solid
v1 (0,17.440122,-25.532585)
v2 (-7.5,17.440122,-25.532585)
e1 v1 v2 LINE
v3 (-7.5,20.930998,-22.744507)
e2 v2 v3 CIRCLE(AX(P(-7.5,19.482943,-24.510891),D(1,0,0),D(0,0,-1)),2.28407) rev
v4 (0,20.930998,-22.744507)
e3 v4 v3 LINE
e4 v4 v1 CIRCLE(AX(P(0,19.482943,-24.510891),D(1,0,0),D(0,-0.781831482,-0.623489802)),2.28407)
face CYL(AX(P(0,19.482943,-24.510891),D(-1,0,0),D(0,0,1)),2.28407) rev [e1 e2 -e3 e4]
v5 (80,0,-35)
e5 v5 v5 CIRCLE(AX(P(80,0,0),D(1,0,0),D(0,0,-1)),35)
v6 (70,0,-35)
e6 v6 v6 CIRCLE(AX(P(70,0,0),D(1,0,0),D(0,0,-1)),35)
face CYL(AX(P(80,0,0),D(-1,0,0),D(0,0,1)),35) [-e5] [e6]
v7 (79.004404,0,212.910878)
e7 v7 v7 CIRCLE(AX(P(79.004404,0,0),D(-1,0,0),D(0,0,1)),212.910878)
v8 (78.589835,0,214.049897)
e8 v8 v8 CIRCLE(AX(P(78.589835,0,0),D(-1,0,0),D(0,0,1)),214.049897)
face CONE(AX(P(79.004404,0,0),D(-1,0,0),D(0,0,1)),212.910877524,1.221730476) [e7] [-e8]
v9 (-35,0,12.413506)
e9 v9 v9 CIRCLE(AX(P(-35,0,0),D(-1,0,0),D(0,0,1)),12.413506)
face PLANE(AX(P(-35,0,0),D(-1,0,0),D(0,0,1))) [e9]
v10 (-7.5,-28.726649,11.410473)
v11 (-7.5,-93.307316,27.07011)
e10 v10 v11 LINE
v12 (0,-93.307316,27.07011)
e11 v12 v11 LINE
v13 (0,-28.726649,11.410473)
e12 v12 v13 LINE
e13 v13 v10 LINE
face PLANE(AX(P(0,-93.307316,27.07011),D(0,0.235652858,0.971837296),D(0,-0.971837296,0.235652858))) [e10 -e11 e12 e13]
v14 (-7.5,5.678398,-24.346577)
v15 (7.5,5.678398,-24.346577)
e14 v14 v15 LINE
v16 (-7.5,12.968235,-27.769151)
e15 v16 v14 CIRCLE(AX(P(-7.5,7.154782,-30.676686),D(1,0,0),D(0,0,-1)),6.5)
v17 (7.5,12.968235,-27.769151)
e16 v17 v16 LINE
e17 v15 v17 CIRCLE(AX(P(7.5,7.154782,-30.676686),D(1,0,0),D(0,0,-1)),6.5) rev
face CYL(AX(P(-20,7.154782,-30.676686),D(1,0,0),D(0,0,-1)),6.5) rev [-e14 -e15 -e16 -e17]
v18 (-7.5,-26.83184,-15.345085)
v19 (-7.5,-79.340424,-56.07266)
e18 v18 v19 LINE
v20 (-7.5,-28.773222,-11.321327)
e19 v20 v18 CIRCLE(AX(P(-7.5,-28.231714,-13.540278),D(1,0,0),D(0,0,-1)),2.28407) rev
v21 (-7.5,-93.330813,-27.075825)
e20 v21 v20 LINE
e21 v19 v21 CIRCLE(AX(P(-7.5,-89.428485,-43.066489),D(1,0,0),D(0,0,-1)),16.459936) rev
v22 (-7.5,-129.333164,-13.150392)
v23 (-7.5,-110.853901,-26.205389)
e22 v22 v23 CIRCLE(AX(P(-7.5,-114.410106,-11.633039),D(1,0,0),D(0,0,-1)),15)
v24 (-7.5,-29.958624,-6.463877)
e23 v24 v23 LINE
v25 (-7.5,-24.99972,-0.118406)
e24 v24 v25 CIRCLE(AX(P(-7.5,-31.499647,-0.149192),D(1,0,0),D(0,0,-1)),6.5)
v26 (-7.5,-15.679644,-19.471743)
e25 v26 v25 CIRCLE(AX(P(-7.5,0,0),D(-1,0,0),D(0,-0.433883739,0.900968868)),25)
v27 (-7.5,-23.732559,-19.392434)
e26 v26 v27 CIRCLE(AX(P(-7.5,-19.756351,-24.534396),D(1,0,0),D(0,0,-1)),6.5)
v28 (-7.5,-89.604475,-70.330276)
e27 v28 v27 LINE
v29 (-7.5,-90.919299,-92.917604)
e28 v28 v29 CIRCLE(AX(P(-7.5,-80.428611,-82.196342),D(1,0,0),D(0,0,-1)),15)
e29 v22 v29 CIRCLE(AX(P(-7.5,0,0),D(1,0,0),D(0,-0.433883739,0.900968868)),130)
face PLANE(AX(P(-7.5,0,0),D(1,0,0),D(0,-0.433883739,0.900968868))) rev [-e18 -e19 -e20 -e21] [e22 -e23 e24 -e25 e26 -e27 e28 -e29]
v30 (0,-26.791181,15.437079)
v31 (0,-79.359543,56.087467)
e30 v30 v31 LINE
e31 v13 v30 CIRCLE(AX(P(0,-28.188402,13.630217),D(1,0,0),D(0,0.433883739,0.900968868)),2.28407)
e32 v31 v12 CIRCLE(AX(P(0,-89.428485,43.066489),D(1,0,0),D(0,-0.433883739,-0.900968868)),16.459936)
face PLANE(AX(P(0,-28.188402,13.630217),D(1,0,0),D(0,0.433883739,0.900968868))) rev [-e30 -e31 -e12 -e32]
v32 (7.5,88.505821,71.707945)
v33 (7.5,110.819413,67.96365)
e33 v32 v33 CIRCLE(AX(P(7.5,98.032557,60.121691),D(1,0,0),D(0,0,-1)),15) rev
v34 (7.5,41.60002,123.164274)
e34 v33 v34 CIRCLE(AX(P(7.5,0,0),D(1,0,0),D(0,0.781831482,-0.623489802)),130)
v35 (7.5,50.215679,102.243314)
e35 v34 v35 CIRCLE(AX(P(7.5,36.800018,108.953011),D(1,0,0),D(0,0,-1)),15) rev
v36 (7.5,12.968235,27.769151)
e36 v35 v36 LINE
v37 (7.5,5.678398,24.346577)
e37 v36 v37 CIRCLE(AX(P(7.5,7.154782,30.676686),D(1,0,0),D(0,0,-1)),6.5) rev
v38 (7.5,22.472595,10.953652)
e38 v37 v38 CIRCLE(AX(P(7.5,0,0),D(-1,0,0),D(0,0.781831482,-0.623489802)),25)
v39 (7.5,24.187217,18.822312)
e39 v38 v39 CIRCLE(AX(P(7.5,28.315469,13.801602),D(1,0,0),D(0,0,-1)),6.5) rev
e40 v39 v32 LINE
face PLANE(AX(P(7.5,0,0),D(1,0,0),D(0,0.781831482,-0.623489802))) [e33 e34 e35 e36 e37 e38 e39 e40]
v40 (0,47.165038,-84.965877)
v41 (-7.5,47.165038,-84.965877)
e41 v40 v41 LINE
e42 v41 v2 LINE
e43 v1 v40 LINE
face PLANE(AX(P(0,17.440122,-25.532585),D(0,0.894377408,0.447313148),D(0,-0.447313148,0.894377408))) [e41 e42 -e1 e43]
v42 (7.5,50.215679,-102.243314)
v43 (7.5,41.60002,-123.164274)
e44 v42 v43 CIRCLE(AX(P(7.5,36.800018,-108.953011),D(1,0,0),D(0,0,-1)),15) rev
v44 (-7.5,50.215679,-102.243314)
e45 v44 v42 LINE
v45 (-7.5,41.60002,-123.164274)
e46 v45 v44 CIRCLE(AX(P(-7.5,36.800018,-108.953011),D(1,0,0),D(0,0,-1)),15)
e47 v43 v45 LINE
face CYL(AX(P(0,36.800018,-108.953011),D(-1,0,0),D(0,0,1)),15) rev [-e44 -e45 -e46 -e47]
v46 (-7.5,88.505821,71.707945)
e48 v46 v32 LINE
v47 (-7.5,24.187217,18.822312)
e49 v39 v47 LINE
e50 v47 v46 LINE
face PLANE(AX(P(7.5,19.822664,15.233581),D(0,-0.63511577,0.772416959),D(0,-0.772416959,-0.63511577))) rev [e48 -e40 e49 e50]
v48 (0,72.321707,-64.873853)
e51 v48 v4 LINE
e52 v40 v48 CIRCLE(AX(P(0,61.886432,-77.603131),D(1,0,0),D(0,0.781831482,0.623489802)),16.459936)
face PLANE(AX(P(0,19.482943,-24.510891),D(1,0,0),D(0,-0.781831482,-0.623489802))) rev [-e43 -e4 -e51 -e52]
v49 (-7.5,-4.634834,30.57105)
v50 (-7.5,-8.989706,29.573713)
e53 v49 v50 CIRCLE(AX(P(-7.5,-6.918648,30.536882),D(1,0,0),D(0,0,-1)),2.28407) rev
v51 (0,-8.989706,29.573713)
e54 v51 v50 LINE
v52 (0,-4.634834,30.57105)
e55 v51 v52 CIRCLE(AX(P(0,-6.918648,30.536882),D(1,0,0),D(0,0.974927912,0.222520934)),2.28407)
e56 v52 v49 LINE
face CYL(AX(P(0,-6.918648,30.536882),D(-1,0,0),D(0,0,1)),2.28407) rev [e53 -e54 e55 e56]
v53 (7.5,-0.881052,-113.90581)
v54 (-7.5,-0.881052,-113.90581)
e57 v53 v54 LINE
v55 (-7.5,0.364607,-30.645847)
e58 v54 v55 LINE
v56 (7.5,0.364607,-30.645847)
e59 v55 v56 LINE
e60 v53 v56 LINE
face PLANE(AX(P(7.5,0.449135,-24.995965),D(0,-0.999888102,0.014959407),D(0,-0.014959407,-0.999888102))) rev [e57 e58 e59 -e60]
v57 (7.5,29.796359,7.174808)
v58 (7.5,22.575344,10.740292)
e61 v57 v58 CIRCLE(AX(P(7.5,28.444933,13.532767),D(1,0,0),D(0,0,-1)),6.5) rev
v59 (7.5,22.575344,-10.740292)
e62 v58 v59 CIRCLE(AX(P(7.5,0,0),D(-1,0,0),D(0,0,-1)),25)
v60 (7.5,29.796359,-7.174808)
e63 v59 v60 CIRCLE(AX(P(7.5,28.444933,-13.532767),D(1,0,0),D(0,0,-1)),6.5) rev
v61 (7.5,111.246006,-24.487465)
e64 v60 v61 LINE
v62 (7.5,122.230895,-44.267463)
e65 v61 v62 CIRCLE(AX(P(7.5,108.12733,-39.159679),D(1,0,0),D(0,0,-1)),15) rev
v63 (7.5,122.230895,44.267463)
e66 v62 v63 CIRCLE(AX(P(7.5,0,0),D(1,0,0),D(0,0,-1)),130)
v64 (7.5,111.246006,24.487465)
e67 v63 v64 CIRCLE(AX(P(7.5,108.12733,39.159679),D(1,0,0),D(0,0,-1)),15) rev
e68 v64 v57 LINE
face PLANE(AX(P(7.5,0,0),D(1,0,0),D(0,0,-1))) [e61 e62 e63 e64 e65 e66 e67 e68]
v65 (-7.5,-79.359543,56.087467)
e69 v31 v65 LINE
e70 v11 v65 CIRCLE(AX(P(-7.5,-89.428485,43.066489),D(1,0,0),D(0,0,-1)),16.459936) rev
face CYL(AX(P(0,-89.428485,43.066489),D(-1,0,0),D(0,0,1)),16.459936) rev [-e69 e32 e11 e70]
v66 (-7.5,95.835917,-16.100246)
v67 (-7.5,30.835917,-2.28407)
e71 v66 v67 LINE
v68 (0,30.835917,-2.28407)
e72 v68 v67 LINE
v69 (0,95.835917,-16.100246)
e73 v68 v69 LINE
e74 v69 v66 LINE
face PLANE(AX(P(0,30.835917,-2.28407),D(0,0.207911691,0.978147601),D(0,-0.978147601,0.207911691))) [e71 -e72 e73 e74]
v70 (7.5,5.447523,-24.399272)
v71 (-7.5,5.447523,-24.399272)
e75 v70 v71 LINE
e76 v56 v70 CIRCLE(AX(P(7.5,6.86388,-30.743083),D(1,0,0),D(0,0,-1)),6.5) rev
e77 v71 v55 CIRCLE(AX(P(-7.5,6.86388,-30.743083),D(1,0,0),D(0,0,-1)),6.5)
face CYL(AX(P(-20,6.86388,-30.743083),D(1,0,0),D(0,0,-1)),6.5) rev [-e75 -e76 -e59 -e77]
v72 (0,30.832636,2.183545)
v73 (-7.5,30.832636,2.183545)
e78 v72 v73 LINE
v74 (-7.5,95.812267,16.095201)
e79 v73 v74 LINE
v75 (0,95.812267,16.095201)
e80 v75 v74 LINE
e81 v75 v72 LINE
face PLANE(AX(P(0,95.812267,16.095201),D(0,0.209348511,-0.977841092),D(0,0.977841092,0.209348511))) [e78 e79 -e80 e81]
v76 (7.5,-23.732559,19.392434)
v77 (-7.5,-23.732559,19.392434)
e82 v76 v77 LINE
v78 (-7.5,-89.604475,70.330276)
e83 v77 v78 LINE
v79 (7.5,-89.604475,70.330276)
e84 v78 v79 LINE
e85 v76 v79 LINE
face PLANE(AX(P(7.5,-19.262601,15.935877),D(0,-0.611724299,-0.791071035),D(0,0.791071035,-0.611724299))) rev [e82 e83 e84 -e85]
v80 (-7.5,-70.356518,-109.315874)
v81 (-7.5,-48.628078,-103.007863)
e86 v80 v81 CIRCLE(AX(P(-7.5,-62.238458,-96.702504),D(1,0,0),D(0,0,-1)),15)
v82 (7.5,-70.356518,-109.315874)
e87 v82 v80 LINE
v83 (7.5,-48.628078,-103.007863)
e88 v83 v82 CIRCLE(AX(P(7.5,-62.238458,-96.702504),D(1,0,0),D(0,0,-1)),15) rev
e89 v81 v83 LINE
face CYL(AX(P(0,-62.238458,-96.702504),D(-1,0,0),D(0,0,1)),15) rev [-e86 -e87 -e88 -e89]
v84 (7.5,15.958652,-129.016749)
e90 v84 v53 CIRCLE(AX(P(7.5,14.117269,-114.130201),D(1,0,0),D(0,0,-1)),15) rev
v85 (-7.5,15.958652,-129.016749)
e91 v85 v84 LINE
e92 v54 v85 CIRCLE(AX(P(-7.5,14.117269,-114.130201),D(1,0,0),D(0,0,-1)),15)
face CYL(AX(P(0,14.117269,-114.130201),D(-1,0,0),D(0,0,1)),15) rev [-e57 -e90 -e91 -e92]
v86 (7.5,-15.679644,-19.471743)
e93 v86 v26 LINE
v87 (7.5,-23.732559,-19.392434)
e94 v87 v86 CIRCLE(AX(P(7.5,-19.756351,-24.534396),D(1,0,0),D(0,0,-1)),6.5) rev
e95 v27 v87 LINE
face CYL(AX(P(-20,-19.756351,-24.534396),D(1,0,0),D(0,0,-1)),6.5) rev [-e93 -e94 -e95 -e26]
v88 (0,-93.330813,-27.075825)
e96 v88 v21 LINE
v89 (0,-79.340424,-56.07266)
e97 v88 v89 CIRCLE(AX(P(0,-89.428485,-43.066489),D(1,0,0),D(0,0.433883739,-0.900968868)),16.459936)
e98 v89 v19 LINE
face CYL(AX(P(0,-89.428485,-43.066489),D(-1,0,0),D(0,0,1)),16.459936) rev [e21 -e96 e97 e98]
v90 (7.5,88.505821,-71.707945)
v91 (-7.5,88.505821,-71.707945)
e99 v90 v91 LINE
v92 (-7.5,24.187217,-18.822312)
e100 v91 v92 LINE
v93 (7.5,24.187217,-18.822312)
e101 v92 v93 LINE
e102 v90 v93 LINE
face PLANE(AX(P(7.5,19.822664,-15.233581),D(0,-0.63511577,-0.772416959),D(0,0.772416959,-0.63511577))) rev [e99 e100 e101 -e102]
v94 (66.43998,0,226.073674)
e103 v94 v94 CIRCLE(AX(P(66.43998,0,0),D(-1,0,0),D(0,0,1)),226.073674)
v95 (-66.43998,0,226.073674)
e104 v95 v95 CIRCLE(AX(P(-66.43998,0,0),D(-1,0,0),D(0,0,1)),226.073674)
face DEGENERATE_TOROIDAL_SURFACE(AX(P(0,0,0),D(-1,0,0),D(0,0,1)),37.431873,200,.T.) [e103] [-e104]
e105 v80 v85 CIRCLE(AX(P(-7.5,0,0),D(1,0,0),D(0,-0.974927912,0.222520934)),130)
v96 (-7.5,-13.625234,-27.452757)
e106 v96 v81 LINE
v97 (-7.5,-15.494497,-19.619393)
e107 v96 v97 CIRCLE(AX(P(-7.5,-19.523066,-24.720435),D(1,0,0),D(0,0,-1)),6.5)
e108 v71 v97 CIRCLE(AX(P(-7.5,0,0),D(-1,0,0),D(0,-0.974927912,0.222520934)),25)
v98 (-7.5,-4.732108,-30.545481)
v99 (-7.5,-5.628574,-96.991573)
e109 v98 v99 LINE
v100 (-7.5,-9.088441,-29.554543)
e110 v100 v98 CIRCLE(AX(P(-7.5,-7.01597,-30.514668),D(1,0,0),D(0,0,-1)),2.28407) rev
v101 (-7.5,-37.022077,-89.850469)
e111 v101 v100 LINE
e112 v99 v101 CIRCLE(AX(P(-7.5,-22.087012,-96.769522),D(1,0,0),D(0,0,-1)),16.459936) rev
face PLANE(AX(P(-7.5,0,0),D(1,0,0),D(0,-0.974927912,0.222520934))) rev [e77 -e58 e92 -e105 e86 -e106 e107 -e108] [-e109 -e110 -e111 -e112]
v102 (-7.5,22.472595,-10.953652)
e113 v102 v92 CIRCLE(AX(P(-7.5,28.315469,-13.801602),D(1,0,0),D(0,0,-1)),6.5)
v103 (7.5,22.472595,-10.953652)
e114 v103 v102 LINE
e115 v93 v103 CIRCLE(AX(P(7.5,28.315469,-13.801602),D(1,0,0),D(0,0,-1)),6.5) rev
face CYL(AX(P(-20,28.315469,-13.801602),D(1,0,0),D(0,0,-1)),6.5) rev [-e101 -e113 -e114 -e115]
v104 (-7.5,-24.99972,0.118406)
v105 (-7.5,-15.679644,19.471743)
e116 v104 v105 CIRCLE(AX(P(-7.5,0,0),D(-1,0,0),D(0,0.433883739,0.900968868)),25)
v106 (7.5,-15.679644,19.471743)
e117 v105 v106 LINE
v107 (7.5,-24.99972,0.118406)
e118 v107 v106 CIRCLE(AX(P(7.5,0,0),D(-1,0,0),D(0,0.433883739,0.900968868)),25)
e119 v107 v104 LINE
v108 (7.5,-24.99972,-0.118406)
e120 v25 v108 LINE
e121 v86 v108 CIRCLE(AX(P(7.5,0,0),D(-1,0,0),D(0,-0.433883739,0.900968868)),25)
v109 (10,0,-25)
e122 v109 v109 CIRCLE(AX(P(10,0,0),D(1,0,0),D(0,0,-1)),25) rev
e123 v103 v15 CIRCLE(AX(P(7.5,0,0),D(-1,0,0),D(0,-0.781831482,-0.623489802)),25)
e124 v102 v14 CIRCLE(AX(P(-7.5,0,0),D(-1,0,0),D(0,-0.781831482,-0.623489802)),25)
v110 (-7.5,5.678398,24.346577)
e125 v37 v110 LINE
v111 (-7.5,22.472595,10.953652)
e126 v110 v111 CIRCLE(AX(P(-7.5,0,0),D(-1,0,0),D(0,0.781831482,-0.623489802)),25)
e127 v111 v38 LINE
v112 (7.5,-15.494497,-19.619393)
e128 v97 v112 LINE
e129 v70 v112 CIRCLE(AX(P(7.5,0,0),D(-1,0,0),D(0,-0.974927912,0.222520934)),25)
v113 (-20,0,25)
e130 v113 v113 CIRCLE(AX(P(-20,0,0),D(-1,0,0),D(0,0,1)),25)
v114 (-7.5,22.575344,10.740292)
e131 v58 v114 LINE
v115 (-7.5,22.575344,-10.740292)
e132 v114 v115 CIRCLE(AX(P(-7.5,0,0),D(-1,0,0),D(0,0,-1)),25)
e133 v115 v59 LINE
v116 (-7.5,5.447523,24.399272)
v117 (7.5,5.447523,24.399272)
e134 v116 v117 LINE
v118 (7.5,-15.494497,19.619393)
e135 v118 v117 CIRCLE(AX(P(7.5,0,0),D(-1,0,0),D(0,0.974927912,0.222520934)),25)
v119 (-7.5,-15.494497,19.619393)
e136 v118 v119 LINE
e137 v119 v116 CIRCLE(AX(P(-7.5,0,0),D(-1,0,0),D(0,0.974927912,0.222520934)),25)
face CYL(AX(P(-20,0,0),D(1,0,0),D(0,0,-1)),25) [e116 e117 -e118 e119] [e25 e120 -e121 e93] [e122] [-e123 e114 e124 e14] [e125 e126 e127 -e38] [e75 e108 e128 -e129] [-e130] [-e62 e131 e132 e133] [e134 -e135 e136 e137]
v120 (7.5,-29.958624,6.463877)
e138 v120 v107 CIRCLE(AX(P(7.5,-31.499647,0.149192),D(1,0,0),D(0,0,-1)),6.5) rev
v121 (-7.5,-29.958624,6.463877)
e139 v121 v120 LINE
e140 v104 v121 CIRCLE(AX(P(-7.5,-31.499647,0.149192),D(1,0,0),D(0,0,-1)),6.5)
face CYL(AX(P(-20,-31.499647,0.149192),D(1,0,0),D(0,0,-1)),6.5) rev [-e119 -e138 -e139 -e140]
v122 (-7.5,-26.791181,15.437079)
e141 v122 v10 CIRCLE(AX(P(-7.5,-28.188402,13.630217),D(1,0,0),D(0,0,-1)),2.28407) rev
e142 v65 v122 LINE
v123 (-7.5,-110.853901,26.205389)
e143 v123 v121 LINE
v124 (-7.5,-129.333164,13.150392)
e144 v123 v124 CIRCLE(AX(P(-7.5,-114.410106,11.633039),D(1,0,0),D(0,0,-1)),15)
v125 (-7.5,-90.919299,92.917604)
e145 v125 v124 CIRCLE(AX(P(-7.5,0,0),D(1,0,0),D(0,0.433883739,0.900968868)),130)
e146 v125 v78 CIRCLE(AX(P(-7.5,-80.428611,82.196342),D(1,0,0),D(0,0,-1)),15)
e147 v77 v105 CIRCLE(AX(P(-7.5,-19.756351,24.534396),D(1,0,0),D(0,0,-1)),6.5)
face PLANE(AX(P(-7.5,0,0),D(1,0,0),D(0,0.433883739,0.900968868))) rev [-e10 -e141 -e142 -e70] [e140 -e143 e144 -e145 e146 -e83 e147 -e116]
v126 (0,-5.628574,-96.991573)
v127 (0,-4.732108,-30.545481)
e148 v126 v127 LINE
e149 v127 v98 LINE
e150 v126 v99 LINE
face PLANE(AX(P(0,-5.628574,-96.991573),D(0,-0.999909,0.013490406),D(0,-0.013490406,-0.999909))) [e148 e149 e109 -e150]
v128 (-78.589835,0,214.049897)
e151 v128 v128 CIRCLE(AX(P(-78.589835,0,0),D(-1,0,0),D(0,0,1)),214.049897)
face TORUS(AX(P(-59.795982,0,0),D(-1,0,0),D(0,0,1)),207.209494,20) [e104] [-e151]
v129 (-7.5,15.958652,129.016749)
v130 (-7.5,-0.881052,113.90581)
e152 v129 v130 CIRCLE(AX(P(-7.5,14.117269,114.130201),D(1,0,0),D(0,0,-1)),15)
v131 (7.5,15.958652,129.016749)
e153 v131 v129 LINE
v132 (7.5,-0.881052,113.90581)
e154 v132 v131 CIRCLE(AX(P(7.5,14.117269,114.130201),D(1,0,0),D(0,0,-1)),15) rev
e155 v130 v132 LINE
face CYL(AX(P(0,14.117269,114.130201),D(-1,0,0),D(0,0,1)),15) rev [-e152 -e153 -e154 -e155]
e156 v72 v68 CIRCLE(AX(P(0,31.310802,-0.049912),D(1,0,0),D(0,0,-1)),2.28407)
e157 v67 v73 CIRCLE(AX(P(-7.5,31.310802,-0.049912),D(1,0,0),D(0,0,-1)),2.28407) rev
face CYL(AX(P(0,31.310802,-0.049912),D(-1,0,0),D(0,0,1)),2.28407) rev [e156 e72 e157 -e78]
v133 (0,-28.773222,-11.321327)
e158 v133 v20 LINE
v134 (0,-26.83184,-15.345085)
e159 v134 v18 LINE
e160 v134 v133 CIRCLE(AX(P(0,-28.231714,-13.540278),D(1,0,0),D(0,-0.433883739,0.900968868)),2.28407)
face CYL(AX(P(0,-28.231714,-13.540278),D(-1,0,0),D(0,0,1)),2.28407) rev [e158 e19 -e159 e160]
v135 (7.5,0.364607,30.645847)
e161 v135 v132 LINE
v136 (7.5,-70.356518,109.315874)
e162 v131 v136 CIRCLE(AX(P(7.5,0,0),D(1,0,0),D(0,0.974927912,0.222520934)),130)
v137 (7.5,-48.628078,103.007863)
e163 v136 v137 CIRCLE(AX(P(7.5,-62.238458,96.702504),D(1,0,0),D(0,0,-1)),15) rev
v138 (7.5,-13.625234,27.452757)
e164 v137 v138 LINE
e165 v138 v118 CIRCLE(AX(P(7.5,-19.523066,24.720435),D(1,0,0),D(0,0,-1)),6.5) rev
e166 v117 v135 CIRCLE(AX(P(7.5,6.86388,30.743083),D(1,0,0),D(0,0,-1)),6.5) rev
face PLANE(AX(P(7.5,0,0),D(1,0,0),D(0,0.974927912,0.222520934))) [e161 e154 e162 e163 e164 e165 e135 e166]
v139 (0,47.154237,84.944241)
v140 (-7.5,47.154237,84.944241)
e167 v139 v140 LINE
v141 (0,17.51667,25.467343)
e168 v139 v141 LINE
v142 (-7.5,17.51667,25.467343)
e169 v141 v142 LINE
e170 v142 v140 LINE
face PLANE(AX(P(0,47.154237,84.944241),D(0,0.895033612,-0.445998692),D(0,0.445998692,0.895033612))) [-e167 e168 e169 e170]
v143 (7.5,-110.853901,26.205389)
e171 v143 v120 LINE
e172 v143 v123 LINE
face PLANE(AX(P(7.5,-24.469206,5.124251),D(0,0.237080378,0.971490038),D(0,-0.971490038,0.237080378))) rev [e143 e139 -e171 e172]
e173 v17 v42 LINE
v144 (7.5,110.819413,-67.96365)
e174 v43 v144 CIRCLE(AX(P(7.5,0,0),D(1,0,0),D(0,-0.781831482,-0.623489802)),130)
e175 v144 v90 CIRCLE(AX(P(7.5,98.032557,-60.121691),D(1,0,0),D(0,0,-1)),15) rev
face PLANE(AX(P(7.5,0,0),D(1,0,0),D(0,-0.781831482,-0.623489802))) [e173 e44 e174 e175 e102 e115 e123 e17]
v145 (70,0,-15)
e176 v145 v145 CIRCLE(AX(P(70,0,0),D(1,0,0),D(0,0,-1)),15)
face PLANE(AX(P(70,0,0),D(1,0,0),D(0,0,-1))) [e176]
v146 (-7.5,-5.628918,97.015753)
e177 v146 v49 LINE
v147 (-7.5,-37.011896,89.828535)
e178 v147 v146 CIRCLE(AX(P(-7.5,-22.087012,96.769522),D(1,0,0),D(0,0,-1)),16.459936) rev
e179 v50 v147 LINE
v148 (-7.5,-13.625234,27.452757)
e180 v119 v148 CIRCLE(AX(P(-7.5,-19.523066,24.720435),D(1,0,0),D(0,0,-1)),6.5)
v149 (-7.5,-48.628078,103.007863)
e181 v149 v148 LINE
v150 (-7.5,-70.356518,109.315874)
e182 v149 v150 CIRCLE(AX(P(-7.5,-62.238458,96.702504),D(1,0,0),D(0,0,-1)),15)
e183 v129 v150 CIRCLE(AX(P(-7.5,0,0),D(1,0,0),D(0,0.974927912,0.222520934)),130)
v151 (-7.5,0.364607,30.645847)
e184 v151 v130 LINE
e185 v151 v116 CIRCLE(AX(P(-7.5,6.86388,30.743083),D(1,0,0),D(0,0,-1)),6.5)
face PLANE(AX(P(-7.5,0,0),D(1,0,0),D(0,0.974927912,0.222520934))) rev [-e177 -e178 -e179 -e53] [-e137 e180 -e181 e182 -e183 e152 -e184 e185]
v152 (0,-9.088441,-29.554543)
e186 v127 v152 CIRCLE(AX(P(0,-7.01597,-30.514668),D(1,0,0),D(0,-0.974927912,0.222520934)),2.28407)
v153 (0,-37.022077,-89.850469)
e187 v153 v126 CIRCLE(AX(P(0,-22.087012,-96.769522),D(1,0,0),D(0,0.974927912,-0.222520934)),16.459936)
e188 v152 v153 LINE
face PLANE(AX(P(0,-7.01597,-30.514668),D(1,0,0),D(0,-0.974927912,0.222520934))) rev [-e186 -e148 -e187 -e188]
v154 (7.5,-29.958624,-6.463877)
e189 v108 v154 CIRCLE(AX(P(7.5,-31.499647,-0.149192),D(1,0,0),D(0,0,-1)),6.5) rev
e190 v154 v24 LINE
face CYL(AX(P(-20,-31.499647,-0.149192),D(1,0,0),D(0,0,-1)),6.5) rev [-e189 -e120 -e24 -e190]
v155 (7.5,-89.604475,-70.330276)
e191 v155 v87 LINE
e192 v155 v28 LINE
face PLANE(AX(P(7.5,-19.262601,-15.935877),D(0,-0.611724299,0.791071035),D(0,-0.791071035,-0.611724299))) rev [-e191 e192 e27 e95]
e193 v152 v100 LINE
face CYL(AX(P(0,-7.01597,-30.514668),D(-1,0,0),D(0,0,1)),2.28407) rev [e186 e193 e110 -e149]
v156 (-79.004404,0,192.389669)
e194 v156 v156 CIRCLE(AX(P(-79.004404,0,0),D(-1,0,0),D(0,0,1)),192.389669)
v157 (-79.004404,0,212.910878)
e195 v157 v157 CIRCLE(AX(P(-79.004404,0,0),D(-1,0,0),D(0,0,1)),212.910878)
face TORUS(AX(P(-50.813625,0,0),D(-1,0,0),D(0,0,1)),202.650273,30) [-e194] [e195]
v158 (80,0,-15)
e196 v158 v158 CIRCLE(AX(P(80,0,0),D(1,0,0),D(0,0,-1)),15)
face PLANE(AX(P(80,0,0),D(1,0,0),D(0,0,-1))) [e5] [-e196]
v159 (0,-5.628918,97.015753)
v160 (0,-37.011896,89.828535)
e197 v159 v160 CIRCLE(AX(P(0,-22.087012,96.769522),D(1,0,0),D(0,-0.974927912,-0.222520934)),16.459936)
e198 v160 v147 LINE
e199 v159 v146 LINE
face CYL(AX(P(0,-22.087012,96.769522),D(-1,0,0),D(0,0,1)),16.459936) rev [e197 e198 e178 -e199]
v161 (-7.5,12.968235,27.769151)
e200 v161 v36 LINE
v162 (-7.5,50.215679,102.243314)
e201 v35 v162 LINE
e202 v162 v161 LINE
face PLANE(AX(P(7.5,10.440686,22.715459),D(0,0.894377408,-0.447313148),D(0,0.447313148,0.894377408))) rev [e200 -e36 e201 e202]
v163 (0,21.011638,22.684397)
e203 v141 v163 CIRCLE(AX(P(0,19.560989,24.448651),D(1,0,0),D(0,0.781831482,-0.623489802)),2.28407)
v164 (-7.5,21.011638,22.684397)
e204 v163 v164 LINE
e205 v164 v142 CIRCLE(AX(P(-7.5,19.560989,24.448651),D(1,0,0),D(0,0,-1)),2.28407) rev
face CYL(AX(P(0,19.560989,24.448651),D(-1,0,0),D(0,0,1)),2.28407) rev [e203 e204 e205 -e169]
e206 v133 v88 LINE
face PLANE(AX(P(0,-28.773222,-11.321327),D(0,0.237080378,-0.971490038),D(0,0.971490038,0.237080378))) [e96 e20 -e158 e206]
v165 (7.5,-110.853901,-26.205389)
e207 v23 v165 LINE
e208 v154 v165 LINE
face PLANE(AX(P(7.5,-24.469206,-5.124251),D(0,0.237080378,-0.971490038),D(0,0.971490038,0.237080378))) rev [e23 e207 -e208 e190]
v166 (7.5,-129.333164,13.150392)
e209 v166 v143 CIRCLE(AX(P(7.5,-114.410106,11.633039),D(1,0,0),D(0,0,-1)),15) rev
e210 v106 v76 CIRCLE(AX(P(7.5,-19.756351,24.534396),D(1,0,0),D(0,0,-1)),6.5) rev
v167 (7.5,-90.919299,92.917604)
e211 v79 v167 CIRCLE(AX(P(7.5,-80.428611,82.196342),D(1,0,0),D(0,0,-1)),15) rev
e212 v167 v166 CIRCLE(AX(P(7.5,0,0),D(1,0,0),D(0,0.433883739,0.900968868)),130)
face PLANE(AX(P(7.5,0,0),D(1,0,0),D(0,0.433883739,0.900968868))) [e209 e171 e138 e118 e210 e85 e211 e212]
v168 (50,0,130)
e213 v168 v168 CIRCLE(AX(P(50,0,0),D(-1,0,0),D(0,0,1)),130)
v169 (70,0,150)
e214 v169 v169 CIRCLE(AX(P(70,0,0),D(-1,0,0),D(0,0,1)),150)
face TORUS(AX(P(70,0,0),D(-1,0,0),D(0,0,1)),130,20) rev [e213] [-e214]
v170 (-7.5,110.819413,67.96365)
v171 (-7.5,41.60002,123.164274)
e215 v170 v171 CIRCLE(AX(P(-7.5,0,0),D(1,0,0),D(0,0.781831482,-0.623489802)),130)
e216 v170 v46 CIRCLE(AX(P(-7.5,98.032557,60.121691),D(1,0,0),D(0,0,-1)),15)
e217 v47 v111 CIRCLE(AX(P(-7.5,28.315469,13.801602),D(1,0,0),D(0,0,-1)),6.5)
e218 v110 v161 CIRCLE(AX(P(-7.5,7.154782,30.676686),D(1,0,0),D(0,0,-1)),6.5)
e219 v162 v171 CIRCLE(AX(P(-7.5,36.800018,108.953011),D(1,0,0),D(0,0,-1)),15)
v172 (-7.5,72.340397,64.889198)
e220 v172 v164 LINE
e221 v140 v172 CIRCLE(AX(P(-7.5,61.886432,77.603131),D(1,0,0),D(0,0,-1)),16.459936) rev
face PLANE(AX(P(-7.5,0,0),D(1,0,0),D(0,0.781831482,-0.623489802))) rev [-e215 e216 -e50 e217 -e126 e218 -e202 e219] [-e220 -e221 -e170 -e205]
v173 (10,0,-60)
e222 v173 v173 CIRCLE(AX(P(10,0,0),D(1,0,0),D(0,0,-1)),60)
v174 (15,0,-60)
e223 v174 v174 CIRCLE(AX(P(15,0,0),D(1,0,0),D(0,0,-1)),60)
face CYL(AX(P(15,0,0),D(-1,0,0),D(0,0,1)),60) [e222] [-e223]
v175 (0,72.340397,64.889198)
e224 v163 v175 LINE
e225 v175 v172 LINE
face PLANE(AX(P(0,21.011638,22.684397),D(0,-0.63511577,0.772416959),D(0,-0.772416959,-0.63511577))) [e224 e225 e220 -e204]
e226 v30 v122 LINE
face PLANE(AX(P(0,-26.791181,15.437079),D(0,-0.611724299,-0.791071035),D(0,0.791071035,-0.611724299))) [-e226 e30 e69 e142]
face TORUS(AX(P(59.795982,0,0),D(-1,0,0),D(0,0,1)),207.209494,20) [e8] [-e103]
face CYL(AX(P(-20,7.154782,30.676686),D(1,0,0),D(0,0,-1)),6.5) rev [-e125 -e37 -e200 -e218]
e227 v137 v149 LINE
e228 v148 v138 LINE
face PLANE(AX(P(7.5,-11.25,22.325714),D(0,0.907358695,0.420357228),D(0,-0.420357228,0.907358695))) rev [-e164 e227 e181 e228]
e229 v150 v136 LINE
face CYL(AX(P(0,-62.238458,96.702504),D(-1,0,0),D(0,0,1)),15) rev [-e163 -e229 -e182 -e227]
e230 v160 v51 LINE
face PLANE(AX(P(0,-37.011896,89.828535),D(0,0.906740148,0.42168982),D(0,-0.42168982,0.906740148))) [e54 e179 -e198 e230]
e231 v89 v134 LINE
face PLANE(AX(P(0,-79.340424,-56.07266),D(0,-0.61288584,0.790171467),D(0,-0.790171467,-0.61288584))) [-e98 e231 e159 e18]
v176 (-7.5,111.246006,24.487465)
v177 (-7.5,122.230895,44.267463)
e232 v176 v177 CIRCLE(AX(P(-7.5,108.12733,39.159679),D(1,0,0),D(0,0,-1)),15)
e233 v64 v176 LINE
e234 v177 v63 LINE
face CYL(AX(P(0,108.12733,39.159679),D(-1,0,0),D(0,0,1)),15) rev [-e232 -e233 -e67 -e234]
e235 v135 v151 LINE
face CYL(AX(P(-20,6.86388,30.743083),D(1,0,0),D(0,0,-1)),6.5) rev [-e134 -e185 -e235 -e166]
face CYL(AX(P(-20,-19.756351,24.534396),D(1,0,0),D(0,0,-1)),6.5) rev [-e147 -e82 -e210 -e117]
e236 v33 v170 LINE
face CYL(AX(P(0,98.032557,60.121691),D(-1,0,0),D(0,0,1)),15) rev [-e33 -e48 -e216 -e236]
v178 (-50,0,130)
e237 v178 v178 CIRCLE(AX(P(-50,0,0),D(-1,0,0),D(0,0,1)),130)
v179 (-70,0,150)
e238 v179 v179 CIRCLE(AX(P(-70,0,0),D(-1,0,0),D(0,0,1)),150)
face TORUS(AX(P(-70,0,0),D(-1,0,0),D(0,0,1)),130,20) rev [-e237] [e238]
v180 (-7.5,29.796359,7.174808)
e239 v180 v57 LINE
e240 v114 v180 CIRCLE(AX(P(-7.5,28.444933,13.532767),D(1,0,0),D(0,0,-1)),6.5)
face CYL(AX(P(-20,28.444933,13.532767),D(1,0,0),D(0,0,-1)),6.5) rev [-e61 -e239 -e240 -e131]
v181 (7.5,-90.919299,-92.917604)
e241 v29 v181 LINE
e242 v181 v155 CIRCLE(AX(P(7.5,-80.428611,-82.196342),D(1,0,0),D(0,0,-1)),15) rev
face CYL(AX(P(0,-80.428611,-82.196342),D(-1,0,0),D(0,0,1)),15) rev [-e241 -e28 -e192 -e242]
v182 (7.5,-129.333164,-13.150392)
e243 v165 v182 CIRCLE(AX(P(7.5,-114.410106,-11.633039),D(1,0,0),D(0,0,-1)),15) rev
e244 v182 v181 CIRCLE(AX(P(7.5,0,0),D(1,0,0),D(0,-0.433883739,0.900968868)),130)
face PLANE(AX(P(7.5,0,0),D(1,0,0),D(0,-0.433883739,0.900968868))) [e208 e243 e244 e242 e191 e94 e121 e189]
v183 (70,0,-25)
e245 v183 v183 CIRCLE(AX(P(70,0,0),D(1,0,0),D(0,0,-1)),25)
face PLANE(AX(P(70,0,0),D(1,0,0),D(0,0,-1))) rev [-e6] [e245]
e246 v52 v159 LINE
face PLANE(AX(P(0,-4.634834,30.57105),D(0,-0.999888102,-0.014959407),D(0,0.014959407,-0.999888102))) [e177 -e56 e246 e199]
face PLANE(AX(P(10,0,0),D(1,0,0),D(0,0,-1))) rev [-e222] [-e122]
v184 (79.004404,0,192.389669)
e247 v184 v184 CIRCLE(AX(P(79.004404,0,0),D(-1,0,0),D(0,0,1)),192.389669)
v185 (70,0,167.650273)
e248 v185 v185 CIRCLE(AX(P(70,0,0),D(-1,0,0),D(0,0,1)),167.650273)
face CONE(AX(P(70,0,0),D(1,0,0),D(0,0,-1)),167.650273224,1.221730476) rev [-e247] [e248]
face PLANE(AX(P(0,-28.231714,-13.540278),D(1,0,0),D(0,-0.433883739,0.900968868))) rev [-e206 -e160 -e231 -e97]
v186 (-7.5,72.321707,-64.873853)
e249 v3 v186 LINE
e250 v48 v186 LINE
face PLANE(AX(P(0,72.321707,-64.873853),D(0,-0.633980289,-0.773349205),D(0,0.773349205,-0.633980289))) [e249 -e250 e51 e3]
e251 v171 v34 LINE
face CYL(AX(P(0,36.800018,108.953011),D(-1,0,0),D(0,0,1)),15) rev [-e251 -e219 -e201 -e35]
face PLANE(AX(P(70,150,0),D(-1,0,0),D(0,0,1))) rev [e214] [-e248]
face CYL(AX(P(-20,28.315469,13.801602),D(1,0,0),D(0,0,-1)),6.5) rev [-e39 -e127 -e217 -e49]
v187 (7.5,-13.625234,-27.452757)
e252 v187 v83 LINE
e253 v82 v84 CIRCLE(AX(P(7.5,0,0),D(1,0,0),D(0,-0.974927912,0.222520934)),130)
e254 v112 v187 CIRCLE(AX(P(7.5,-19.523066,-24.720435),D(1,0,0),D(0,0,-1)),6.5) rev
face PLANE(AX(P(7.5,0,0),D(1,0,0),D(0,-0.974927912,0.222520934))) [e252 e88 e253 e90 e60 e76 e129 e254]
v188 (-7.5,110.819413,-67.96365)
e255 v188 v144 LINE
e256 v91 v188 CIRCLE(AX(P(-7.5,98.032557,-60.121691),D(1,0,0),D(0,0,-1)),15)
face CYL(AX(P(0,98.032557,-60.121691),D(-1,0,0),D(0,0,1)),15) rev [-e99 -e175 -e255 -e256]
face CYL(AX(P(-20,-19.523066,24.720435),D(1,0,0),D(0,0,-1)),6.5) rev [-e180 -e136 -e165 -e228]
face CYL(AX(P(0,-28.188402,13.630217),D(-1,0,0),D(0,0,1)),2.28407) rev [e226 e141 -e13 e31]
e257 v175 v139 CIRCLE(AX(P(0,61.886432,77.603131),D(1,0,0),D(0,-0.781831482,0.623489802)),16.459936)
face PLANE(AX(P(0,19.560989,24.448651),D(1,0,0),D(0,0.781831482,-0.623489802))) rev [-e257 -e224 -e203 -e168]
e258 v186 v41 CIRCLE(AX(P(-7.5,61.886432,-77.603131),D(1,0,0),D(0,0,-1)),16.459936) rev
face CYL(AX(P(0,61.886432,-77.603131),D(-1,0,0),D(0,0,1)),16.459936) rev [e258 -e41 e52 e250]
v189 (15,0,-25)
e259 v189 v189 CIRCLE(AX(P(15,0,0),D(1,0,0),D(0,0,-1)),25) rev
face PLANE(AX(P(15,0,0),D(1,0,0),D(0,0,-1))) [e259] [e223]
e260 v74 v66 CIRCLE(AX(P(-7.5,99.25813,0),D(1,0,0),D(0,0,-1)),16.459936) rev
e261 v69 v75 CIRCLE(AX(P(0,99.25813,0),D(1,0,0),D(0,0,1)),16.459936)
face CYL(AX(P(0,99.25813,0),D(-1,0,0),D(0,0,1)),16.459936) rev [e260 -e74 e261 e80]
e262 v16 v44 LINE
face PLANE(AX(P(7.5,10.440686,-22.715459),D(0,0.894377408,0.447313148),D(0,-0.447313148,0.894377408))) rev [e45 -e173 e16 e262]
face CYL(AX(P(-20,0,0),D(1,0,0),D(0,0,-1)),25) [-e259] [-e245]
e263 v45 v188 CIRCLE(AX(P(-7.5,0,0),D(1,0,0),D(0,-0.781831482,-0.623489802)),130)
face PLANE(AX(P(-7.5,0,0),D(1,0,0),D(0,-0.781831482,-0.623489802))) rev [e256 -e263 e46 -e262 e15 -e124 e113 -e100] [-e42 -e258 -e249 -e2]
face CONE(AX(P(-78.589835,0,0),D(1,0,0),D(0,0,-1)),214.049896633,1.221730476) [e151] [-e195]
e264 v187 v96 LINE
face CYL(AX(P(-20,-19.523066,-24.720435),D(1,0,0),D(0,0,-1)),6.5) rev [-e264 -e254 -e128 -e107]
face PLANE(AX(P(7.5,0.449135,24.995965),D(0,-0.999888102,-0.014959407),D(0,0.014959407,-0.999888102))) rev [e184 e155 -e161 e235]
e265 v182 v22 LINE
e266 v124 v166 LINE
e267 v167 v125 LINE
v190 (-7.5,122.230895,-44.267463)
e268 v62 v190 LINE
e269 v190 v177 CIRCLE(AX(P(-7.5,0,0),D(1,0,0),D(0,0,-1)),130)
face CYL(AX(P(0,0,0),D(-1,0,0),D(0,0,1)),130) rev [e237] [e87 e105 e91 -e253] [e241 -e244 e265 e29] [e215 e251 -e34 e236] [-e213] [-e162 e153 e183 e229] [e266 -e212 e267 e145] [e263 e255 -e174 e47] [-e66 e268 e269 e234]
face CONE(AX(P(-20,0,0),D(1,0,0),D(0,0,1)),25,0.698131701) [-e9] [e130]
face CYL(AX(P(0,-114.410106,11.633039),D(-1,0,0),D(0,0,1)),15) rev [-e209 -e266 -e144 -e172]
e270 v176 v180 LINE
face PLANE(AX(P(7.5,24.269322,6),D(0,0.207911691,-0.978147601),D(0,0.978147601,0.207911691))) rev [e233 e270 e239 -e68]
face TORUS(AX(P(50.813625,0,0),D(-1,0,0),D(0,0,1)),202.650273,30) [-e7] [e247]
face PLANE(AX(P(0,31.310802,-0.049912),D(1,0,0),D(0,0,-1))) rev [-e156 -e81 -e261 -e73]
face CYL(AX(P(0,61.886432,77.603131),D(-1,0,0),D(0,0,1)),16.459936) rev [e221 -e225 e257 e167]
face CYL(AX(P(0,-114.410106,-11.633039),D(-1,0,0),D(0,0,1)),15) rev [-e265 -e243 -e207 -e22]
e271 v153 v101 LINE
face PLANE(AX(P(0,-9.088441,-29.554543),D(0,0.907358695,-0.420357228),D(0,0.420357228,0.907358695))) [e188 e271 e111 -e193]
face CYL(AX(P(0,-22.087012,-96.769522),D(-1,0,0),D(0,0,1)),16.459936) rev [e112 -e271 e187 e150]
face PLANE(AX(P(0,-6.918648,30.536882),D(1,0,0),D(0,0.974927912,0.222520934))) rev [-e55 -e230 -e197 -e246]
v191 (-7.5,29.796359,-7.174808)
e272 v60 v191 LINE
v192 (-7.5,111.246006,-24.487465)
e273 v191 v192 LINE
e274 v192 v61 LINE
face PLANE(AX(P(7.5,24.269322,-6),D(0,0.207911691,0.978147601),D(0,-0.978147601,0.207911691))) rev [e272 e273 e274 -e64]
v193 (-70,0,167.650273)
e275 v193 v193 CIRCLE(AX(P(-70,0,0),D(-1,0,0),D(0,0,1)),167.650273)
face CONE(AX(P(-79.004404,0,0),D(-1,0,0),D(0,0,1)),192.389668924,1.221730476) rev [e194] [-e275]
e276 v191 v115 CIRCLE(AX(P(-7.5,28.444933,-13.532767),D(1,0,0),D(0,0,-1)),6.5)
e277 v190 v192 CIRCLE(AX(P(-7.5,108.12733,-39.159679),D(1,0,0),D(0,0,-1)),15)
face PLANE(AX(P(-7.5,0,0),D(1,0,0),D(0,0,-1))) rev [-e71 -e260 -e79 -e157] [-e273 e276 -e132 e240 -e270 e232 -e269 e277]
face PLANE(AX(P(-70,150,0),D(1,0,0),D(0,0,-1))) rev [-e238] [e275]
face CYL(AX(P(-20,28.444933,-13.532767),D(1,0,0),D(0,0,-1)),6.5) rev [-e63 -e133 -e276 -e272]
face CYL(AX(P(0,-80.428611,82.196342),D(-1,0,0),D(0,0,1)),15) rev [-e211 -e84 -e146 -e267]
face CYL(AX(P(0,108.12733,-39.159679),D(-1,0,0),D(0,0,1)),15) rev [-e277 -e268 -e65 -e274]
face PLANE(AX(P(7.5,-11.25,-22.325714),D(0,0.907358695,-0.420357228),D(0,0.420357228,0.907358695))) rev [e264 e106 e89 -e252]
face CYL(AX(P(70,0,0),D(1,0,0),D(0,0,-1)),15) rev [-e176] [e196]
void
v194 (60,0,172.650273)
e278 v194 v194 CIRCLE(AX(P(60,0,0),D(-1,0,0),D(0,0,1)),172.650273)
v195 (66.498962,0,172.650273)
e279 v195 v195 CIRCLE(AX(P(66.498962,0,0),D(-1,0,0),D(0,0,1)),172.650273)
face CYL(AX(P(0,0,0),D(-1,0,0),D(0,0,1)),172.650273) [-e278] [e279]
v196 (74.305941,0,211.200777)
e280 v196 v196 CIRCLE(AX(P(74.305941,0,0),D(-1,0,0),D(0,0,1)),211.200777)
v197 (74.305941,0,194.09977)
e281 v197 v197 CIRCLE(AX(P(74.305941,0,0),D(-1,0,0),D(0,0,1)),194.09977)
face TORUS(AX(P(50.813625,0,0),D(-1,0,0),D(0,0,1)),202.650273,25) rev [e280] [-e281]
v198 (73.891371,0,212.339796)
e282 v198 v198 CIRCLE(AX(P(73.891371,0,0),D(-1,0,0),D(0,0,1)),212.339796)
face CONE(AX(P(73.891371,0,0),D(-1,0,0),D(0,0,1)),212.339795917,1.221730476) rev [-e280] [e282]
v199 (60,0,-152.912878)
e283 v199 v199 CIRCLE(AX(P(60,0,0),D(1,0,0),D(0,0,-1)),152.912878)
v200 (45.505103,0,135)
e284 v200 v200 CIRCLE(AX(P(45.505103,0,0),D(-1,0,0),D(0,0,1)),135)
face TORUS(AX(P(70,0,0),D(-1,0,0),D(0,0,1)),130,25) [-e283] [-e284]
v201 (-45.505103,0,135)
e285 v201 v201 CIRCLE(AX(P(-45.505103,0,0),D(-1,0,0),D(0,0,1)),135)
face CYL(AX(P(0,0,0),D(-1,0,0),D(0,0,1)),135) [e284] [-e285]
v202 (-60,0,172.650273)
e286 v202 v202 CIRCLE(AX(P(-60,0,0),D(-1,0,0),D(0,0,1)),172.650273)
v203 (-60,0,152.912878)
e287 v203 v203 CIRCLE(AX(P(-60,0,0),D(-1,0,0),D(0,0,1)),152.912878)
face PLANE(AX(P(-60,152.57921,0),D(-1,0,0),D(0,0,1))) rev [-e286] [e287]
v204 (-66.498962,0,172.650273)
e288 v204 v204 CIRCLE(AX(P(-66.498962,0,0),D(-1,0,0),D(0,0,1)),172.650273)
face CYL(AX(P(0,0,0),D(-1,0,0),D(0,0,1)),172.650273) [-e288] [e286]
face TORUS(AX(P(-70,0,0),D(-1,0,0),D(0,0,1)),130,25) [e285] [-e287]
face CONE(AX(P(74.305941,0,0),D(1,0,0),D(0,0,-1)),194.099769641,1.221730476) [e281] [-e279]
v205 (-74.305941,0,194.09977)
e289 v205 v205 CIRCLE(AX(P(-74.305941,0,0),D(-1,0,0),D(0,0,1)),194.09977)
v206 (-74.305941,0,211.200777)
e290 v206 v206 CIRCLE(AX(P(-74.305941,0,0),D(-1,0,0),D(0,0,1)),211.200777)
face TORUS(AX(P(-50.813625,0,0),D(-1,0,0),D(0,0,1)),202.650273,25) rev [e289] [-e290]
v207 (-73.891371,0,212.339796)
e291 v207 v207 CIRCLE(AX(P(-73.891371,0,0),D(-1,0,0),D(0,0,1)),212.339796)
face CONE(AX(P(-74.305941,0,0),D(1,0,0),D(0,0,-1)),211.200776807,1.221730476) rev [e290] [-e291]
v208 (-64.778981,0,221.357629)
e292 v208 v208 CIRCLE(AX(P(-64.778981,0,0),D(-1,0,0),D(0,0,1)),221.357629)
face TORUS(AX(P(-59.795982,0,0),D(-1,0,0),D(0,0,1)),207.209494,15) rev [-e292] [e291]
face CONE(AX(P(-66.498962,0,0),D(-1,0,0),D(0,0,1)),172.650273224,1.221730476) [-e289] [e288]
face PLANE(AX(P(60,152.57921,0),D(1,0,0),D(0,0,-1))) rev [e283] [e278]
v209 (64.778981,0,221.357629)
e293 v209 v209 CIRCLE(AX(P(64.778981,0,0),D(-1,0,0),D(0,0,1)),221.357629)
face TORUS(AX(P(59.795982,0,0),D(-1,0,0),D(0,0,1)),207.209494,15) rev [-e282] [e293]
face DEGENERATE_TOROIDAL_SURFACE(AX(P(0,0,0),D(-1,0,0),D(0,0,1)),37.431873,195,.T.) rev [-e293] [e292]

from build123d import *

# Parameters (mm, degrees)
BOSS_EXTRUDE1_DEPTH      = 70
BOSS_EXTRUDE1_DEPTH_BACK = 20
SKETCH2_R                = 25
SKETCH3_R                = 25
BOSS_EXTRUDE2_DEPTH      = 15
BOSS_EXTRUDE2_TAPER      = 40
BOSS_EXTRUDE3_DEPTH      = 7.5
CIRPATTERN1_START        = -7.5
CIRPATTERN1_DEPTH        = 15
FILLET1_R                = 15
FILLET2_R                = 6.5
CUT_EXTRUDE5_START       = -20
CUT_EXTRUDE5_DEPTH       = 20
CIRPATTERN2_START        = -7.5
CIRPATTERN2_DEPTH        = 7.5
BOSS_EXTRUDE4_START      = -60
BOSS_EXTRUDE4_OUTLINE_R  = 60
BOSS_EXTRUDE4_DEPTH      = 5
SKETCH9_R                = 35
BOSS_EXTRUDE5_DEPTH      = 10
SKETCH10_R               = 15
CUT_EXTRUDE6_DEPTH       = 10


# Read off the part's stored shape, not the designer's step: CirPattern1, CirPattern2, Boss-Extrude4
with BuildPart() as part:
    # Sketch1 → Revolve2 (revolve)
    with BuildSketch(Plane.XY, mode=Mode.PRIVATE) as revolve2_sk:
        with BuildLine():
            Line((-50, 130), (50, 130))
            ThreePointArc((50, 130), (55.857864376, 144.142135624), (70, 150))
            Line((70, 150), (70, 167.650273224))
            Line((70, 167.650273224), (65, 167.650273224))
            Line((65, 167.650273224), (65, 154.494897428))
            ThreePointArc((65, 154.494897428), (52.32233047, 147.67766953), (45.505102572, 135))
            Line((45.505102572, 135), (-45.505102572, 135))
            ThreePointArc((-45.505102572, 135), (-52.32233047, 147.67766953), (-65, 154.494897428))
            Line((-65, 154.494897428), (-65, 167.650273224))
            Line((-65, 167.650273224), (-70, 167.650273224))
            Line((-70, 167.650273224), (-70, 150))
            ThreePointArc((-70, 150), (-55.857864376, 144.142135624), (-50, 130))
        make_face()
    revolve(revolve2_sk.sketch.rotate(Axis((0, 0, 0), (1, 0, 0)), 90), axis=Axis((0, 0, 0), (1, 0, 0)))

    # Sketch4 → Revolve3 (revolve)
    with BuildSketch(Plane.XY, mode=Mode.PRIVATE) as revolve3_sk:
        with BuildLine():
            Line((65, 152.57921019), (65, 167.650273224))
            Line((65, 167.650273224), (70, 167.650273224))
            Line((70, 167.650273224), (79.004403649, 192.389668924))
            ThreePointArc((79.004403649, 192.389668924), (80.813625025, 202.650273224), (79.004403649, 212.910877524))
            Line((79.004403649, 212.910877524), (78.589834596, 214.049896633))
            ThreePointArc((78.589834596, 214.049896633), (73.864168395, 221.425194124), (66.439980201, 226.073673853))
            ThreePointArc((66.439980201, 226.073673853), (0, 237.431872995), (-66.439980201, 226.073673853))
            ThreePointArc((-66.439980201, 226.073673853), (-73.864168395, 221.425194124), (-78.589834596, 214.049896633))
            Line((-78.589834596, 214.049896633), (-79.004403649, 212.910877524))
            ThreePointArc((-79.004403649, 212.910877524), (-80.813625025, 202.650273224), (-79.004403649, 192.389668924))
            Line((-79.004403649, 192.389668924), (-70, 167.650273224))
            Line((-70, 167.650273224), (-65, 167.650273224))
            Line((-65, 167.650273224), (-65, 152.57921019))
            Line((-65, 152.57921019), (-60, 152.57921019))
            Line((-60, 152.57921019), (-60, 172.650273224))
            Line((-60, 172.650273224), (-66.498962309, 172.650273224))
            Line((-66.498962309, 172.650273224), (-74.305940545, 194.099769641))
            ThreePointArc((-74.305940545, 194.099769641), (-75.813625025, 202.650273224), (-74.305940545, 211.200776807))
            Line((-74.305940545, 211.200776807), (-73.891371493, 212.339795917))
            ThreePointArc((-73.891371493, 212.339795917), (-70.347121841, 217.871269035), (-64.778980696, 221.357628831))
            ThreePointArc((-64.778980696, 221.357628831), (0, 232.431872995), (64.778980696, 221.357628831))
            ThreePointArc((64.778980696, 221.357628831), (70.347121841, 217.871269035), (73.891371493, 212.339795917))
            Line((73.891371493, 212.339795917), (74.305940545, 211.200776807))
            ThreePointArc((74.305940545, 211.200776807), (75.813625025, 202.650273224), (74.305940545, 194.099769641))
            Line((74.305940545, 194.099769641), (66.498962309, 172.650273224))
            Line((66.498962309, 172.650273224), (60, 172.650273224))
            Line((60, 172.650273224), (60, 152.57921019))
            Line((60, 152.57921019), (65, 152.57921019))
        make_face()
    revolve(revolve3_sk.sketch.rotate(Axis((0, 0, 0), (1, 0, 0)), 90), axis=Axis((0, 0, 0), (1, 0, 0)))



with BuildPart() as body_2:
    # Sketch2 → Boss-Extrude1 (new, two sides: drawn at the far end of the back side and taken through both)
    with BuildSketch(Plane(origin=(0, 0, 0), x_dir=(0, 0, -1), z_dir=(1, 0, 0)).offset(-BOSS_EXTRUDE1_DEPTH_BACK)):
        Circle(SKETCH2_R)
    extrude(amount=BOSS_EXTRUDE1_DEPTH + BOSS_EXTRUDE1_DEPTH_BACK)

    # Sketch3 → Boss-Extrude2 (add)
    with BuildSketch(Plane.ZY.offset(20)):
        with Locations(Location((0, 0, 0), (0, 0, 180))):
            Circle(SKETCH3_R)
    extrude(amount=BOSS_EXTRUDE2_DEPTH, taper=BOSS_EXTRUDE2_TAPER)


with BuildPart() as part_1:
    add(part.part)

    add(body_2.part)  # Boss-Extrude3 merges body 2
    # Sketch5 → Boss-Extrude3 (add, symmetric)
    with BuildSketch(Plane(origin=(0, 0, 0), x_dir=(0, 0, -1), z_dir=(1, 0, 0))):
        with BuildLine():
            Line((-6, 24.269322199), (-27.833003207, 126.985526468))
            ThreePointArc((-27.833003207, 126.985526468), (0, 130), (27.833003207, 126.985526468))
            Line((27.833003207, 126.985526468), (6, 24.269322199))
            ThreePointArc((6, 24.269322199), (0, 25), (-6, 24.269322199))
        make_face()
    extrude(amount=BOSS_EXTRUDE3_DEPTH, both=True)

    # CirPattern1 outline → CirPattern1 (add)
    with BuildSketch(Plane.YZ.offset(CIRPATTERN1_START)):
        with BuildLine():
            Line((10.440685994, -22.715458965), (57.413462578, -116.634876066))
            ThreePointArc((57.413462578, -116.634876066), (81.053674242, -101.638092721), (100.934898896, -81.927688756))
            Line((100.934898896, -81.927688756), (19.822663784, -15.233581342))
            ThreePointArc((19.822663784, -15.233581342), (15.587245046, -19.545787062), (10.440685994, -22.715458965))
        make_face()
        with BuildLine():
            ThreePointArc((-55.392109655, -117.608308329), (-28.927721414, -126.740628584), (-1.121766242, -129.995160066))
            Line((-1.121766242, -129.995160066), (0.449135231, -24.995965225))
            ThreePointArc((0.449135231, -24.995965225), (-5.563023349, -24.373197805), (-11.249999715, -22.325714018))
            Line((-11.249999715, -22.325714018), (-55.392109655, -117.608308329))
        make_face()
        with BuildLine():
            ThreePointArc((-126.486293525, -30.020285648), (-117.125952827, -56.404886085), (-102.33371852, -80.173624428))
            Line((-102.33371852, -80.173624428), (-19.262601312, -15.935877469))
            ThreePointArc((-19.262601312, -15.935877469), (-22.524221698, -10.847093478), (-24.469206181, -5.124251054))
            Line((-24.469206181, -5.124251054), (-126.486293525, -30.020285648))
        make_face()
        with BuildLine():
            Line((19.822663784, 15.233581342), (100.934898896, 81.927688756))
            ThreePointArc((100.934898896, 81.927688756), (81.053674242, 101.638092721), (57.413462578, 116.634876066))
            Line((57.413462578, 116.634876066), (10.440685994, 22.715458965))
            ThreePointArc((10.440685994, 22.715458965), (15.587245046, 19.545787062), (19.822663784, 15.233581342))
        make_face()
        with BuildLine():
            ThreePointArc((-102.33371852, 80.173624428), (-117.125952827, 56.404886085), (-126.486293525, 30.020285648))
            Line((-126.486293525, 30.020285648), (-24.469206181, 5.124251054))
            ThreePointArc((-24.469206181, 5.124251054), (-22.524221698, 10.847093478), (-19.262601312, 15.935877469))
            Line((-19.262601312, 15.935877469), (-102.33371852, 80.173624428))
        make_face()
        with BuildLine():
            Line((0.449135231, 24.995965225), (-1.121766242, 129.995160066))
            ThreePointArc((-1.121766242, 129.995160066), (-28.927721414, 126.740628584), (-55.392109655, 117.608308329))
            Line((-55.392109655, 117.608308329), (-11.249999715, 22.325714018))
            ThreePointArc((-11.249999715, 22.325714018), (-5.563023349, 24.373197805), (0.449135231, 24.995965225))
        make_face()
    extrude(amount=CIRPATTERN1_DEPTH)

    # Fillet1
    # the kernel refuses this fillet: 15 mm, written as the material it adds along each edge
    with BuildSketch(Plane(origin=(-7.5, -1.121766242, 129.995160066), x_dir=(0, 0.014959407015905963, -0.9998881018102637), z_dir=(1, 0, 0)), Plane(origin=(-7.5, 57.413462578, -116.634876066), x_dir=(0, -0.4473131483213439, 0.8943774076634804), z_dir=(1, 0, 0)), Plane(origin=(-7.5, -126.486293525, -30.020285648), x_dir=(0, 0.9714900382926073, 0.2370803777165635), z_dir=(1, 0, 0))) as fillet1_piece_1:
        with BuildLine():
            CenterArc((16.091151069, 15), FILLET1_R, 172.091505789, 97.908494211)
            ThreePointArc((1.23381493, 17.063870842), (0.335895406, 8.552254192), (0, 0))
            Line((0, 0), (16.091151069, 0))
        make_face()
    extrude(amount=15)
    with BuildSketch(Plane(origin=(-7.5, -55.392109655, 117.608308329), x_dir=(0, 0.42035722830881256, -0.9073586945682137), z_dir=(1, 0, 0)), Plane(origin=(-7.5, 126.985526468, 27.833003207), x_dir=(0, -0.9781476007338056, -0.20791169081775962), z_dir=(1, 0, 0)), Plane(origin=(-7.5, -102.33371852, -80.173624428), x_dir=(0, 0.7910710346558518, 0.6117242991156392), z_dir=(1, 0, 0))) as fillet1_piece_2:
        with BuildLine():
            CenterArc((16.091151068, -15), FILLET1_R, 90, 97.908494211)
            ThreePointArc((1.233814929, -17.063870842), (0.335895406, -8.552254192), (0, 0))
            Line((0, 0), (16.091151068, 0))
        make_face()
    extrude(amount=15)
    with BuildSketch(Plane(origin=(-7.5, 100.934898896, 81.927688756), x_dir=(0, -0.772416959223735, -0.6351157698432303), z_dir=(1, 0, 0))) as fillet1_piece_3:
        with BuildLine():
            CenterArc((16.091151068, 15), FILLET1_R, 172.091505789, 97.908494211)
            ThreePointArc((1.23381493, 17.063870842), (0.335895406, 8.552254192), (0, 0))
            Line((0, 0), (16.091151068, 0))
        make_face()
    extrude(amount=15)
    with BuildSketch(Plane(origin=(-7.5, 57.413462578, 116.634876066), x_dir=(0, -0.4473131483213439, -0.8943774076634804), z_dir=(1, 0, 0)), Plane(origin=(-7.5, -1.121766242, -129.995160066), x_dir=(0, 0.014959407015905866, 0.9998881018102637), z_dir=(1, 0, 0)), Plane(origin=(-7.5, -126.486293525, 30.020285648), x_dir=(0, 0.9714900382926075, -0.23708037771656312), z_dir=(1, 0, 0))) as fillet1_piece_4:
        with BuildLine():
            CenterArc((16.091151069, -15), FILLET1_R, 90, 97.908494211)
            ThreePointArc((1.23381493, -17.063870842), (0.335895406, -8.552254192), (0, 0))
            Line((0, 0), (16.091151069, 0))
        make_face()
    extrude(amount=15)
    with BuildSketch(Plane(origin=(-7.5, 126.985526468, -27.833003207), x_dir=(0, -0.9781476007338055, 0.20791169081775937), z_dir=(1, 0, 0)), Plane(origin=(-7.5, -55.392109655, -117.608308329), x_dir=(0, 0.4203572283088129, 0.9073586945682134), z_dir=(1, 0, 0)), Plane(origin=(-7.5, -102.33371852, 80.173624428), x_dir=(0, 0.7910710346558513, -0.61172429911564), z_dir=(1, 0, 0))) as fillet1_piece_5:
        with BuildLine():
            CenterArc((16.091151068, 15), FILLET1_R, 172.091505789, 97.908494211)
            ThreePointArc((1.233814929, 17.063870842), (0.335895406, 8.552254192), (0, 0))
            Line((0, 0), (16.091151068, 0))
        make_face()
    extrude(amount=15)
    with BuildSketch(Plane(origin=(-7.5, 100.934898896, -81.927688756), x_dir=(0, -0.7724169592237349, 0.6351157698432305), z_dir=(1, 0, 0))) as fillet1_piece_6:
        with BuildLine():
            CenterArc((16.091151068, -15), FILLET1_R, 90, 97.908494211)
            ThreePointArc((1.23381493, -17.063870842), (0.335895406, -8.552254192), (0, 0))
            Line((0, 0), (16.091151068, 0))
        make_face()
    extrude(amount=15)

    # Fillet2
    fillet2_edges = [part_1.edges().sort_by_distance(p)[0] for p in [
        (0, -11.249999715, 22.325714018),
        (0, 0.449135231, 24.995965225),
        (0, 10.440685994, 22.715458965),
        (0, 19.822663784, 15.233581342),
        (0, 24.269322199, 6),
        (0, 24.269322199, -6),
        (0, 19.822663784, -15.233581342),
        (0, 10.440685994, -22.715458965),
        (0, 0.449135231, -24.995965225),
        (0, -11.249999715, -22.325714018),
        (0, -19.262601312, -15.935877469),
        (0, -24.469206181, -5.124251054),
        (0, -24.469206181, 5.124251054),
        (0, -19.262601312, 15.935877469),
    ]]
    fillet(fillet2_edges, radius=FILLET2_R)

    # Sketch6 → Cut-Extrude5 (cut)
    with BuildSketch(Plane(origin=(0, 0, 0), x_dir=(0, 0, -1), z_dir=(1, 0, 0)).offset(CUT_EXTRUDE5_START)):
        with BuildLine():
            Line((-16.095201307, 95.812267389), (-2.183545012, 30.832635562))
            ThreePointArc((-2.183545012, 30.832635562), (0.051590228, 29.026732899), (2.284069915, 30.83591736))
            Line((2.284069915, 30.83591736), (16.100246424, 95.83591736))
            ThreePointArc((16.100246424, 95.83591736), (-0.012091054, 115.718061447), (-16.095201307, 95.812267389))
        make_face()
    extrude(amount=CUT_EXTRUDE5_DEPTH, mode=Mode.SUBTRACT)

    # CirPattern2 outline → CirPattern2 (cut)
    with BuildSketch(Plane.YZ.offset(CIRPATTERN2_START)):
        with BuildLine():
            ThreePointArc((17.516669604, 25.467343216), (18.138206809, 22.661847632), (21.011637773, 22.684396684))
            Line((21.011637773, 22.684396684), (72.340396655, 64.889197891))
            ThreePointArc((72.340396655, 64.889197891), (72.139578037, 90.479562178), (47.154236512, 84.944240925))
            Line((47.154236512, 84.944240925), (17.516669604, 25.467343216))
        make_face()
        with BuildLine():
            ThreePointArc((-8.989705841, 29.57371254), (-6.408758961, 28.310452009), (-4.634833617, 30.571049903))
            Line((-4.634833617, 30.571049903), (-5.628918206, 97.015752695))
            ThreePointArc((-5.628918206, 97.015752695), (-25.761479015, 112.814077536), (-37.01189623, 89.82853458))
            Line((-37.01189623, 89.82853458), (-8.989705841, 29.57371254))
        make_face()
        with BuildLine():
            ThreePointArc((-28.726649431, 11.410473127), (-26.129798518, 12.640708594), (-26.791180759, 15.437079009))
            Line((-26.791180759, 15.437079009), (-79.359542849, 56.087466959))
            ThreePointArc((-79.359542849, 56.087466959), (-104.263616929, 50.197291521), (-93.307316206, 27.070109528))
            Line((-93.307316206, 27.070109528), (-28.726649431, 11.410473127))
        make_face()
        with BuildLine():
            ThreePointArc((-26.831840082, -15.345085282), (-26.17456684, -12.547746215), (-28.77322235, -11.321327238))
            Line((-28.77322235, -11.321327238), (-93.330813087, -27.075825373))
            ThreePointArc((-93.330813087, -27.075825373), (-104.253124706, -50.219078847), (-79.340423956, -56.072660128))
            Line((-79.340423956, -56.072660128), (-26.831840082, -15.345085282))
        make_face()
        with BuildLine():
            ThreePointArc((-4.732107882, -30.545481491), (-6.509352467, -28.287492197), (-9.088440644, -29.554543161))
            Line((-9.088440644, -29.554543161), (-37.022077469, -89.850468953))
            ThreePointArc((-37.022077469, -89.850468953), (-25.737903203, -112.819458561), (-5.628574218, -96.991573034))
            Line((-5.628574218, -96.991573034), (-4.732107882, -30.545481491))
        make_face()
        with BuildLine():
            ThreePointArc((20.930998071, -22.744507123), (18.05753708, -22.726179595), (17.440122237, -25.532585282))
            Line((17.440122237, -25.532585282), (47.165037596, -84.965876796))
            ThreePointArc((47.165037596, -84.965876796), (72.158484369, -90.464484881), (72.321706708, -64.873853178))
            Line((72.321706708, -64.873853178), (20.930998071, -22.744507123))
        make_face()
    extrude(amount=CIRPATTERN2_DEPTH, mode=Mode.SUBTRACT)

    # Boss-Extrude4 outline → Boss-Extrude4 (add)
    with BuildSketch(Plane(origin=(70, 0, 0), x_dir=(0, 0, -1), z_dir=(1, 0, 0)).offset(BOSS_EXTRUDE4_START)):
        Circle(BOSS_EXTRUDE4_OUTLINE_R)
    extrude(amount=BOSS_EXTRUDE4_DEPTH)

    # Sketch9 → Boss-Extrude5 (add)
    with BuildSketch(Plane(origin=(70, 0, 0), x_dir=(0, 0, -1), z_dir=(1, 0, 0))):
        Circle(SKETCH9_R)
    extrude(amount=BOSS_EXTRUDE5_DEPTH)

    # Sketch10 → Cut-Extrude6 (cut)
    with BuildSketch(Plane(origin=(80, 0, 0), x_dir=(0, 0, -1), z_dir=(1, 0, 0))):
        Circle(SKETCH10_R)
    extrude(amount=-CUT_EXTRUDE6_DEPTH, mode=Mode.SUBTRACT)


solid = part_1.part
